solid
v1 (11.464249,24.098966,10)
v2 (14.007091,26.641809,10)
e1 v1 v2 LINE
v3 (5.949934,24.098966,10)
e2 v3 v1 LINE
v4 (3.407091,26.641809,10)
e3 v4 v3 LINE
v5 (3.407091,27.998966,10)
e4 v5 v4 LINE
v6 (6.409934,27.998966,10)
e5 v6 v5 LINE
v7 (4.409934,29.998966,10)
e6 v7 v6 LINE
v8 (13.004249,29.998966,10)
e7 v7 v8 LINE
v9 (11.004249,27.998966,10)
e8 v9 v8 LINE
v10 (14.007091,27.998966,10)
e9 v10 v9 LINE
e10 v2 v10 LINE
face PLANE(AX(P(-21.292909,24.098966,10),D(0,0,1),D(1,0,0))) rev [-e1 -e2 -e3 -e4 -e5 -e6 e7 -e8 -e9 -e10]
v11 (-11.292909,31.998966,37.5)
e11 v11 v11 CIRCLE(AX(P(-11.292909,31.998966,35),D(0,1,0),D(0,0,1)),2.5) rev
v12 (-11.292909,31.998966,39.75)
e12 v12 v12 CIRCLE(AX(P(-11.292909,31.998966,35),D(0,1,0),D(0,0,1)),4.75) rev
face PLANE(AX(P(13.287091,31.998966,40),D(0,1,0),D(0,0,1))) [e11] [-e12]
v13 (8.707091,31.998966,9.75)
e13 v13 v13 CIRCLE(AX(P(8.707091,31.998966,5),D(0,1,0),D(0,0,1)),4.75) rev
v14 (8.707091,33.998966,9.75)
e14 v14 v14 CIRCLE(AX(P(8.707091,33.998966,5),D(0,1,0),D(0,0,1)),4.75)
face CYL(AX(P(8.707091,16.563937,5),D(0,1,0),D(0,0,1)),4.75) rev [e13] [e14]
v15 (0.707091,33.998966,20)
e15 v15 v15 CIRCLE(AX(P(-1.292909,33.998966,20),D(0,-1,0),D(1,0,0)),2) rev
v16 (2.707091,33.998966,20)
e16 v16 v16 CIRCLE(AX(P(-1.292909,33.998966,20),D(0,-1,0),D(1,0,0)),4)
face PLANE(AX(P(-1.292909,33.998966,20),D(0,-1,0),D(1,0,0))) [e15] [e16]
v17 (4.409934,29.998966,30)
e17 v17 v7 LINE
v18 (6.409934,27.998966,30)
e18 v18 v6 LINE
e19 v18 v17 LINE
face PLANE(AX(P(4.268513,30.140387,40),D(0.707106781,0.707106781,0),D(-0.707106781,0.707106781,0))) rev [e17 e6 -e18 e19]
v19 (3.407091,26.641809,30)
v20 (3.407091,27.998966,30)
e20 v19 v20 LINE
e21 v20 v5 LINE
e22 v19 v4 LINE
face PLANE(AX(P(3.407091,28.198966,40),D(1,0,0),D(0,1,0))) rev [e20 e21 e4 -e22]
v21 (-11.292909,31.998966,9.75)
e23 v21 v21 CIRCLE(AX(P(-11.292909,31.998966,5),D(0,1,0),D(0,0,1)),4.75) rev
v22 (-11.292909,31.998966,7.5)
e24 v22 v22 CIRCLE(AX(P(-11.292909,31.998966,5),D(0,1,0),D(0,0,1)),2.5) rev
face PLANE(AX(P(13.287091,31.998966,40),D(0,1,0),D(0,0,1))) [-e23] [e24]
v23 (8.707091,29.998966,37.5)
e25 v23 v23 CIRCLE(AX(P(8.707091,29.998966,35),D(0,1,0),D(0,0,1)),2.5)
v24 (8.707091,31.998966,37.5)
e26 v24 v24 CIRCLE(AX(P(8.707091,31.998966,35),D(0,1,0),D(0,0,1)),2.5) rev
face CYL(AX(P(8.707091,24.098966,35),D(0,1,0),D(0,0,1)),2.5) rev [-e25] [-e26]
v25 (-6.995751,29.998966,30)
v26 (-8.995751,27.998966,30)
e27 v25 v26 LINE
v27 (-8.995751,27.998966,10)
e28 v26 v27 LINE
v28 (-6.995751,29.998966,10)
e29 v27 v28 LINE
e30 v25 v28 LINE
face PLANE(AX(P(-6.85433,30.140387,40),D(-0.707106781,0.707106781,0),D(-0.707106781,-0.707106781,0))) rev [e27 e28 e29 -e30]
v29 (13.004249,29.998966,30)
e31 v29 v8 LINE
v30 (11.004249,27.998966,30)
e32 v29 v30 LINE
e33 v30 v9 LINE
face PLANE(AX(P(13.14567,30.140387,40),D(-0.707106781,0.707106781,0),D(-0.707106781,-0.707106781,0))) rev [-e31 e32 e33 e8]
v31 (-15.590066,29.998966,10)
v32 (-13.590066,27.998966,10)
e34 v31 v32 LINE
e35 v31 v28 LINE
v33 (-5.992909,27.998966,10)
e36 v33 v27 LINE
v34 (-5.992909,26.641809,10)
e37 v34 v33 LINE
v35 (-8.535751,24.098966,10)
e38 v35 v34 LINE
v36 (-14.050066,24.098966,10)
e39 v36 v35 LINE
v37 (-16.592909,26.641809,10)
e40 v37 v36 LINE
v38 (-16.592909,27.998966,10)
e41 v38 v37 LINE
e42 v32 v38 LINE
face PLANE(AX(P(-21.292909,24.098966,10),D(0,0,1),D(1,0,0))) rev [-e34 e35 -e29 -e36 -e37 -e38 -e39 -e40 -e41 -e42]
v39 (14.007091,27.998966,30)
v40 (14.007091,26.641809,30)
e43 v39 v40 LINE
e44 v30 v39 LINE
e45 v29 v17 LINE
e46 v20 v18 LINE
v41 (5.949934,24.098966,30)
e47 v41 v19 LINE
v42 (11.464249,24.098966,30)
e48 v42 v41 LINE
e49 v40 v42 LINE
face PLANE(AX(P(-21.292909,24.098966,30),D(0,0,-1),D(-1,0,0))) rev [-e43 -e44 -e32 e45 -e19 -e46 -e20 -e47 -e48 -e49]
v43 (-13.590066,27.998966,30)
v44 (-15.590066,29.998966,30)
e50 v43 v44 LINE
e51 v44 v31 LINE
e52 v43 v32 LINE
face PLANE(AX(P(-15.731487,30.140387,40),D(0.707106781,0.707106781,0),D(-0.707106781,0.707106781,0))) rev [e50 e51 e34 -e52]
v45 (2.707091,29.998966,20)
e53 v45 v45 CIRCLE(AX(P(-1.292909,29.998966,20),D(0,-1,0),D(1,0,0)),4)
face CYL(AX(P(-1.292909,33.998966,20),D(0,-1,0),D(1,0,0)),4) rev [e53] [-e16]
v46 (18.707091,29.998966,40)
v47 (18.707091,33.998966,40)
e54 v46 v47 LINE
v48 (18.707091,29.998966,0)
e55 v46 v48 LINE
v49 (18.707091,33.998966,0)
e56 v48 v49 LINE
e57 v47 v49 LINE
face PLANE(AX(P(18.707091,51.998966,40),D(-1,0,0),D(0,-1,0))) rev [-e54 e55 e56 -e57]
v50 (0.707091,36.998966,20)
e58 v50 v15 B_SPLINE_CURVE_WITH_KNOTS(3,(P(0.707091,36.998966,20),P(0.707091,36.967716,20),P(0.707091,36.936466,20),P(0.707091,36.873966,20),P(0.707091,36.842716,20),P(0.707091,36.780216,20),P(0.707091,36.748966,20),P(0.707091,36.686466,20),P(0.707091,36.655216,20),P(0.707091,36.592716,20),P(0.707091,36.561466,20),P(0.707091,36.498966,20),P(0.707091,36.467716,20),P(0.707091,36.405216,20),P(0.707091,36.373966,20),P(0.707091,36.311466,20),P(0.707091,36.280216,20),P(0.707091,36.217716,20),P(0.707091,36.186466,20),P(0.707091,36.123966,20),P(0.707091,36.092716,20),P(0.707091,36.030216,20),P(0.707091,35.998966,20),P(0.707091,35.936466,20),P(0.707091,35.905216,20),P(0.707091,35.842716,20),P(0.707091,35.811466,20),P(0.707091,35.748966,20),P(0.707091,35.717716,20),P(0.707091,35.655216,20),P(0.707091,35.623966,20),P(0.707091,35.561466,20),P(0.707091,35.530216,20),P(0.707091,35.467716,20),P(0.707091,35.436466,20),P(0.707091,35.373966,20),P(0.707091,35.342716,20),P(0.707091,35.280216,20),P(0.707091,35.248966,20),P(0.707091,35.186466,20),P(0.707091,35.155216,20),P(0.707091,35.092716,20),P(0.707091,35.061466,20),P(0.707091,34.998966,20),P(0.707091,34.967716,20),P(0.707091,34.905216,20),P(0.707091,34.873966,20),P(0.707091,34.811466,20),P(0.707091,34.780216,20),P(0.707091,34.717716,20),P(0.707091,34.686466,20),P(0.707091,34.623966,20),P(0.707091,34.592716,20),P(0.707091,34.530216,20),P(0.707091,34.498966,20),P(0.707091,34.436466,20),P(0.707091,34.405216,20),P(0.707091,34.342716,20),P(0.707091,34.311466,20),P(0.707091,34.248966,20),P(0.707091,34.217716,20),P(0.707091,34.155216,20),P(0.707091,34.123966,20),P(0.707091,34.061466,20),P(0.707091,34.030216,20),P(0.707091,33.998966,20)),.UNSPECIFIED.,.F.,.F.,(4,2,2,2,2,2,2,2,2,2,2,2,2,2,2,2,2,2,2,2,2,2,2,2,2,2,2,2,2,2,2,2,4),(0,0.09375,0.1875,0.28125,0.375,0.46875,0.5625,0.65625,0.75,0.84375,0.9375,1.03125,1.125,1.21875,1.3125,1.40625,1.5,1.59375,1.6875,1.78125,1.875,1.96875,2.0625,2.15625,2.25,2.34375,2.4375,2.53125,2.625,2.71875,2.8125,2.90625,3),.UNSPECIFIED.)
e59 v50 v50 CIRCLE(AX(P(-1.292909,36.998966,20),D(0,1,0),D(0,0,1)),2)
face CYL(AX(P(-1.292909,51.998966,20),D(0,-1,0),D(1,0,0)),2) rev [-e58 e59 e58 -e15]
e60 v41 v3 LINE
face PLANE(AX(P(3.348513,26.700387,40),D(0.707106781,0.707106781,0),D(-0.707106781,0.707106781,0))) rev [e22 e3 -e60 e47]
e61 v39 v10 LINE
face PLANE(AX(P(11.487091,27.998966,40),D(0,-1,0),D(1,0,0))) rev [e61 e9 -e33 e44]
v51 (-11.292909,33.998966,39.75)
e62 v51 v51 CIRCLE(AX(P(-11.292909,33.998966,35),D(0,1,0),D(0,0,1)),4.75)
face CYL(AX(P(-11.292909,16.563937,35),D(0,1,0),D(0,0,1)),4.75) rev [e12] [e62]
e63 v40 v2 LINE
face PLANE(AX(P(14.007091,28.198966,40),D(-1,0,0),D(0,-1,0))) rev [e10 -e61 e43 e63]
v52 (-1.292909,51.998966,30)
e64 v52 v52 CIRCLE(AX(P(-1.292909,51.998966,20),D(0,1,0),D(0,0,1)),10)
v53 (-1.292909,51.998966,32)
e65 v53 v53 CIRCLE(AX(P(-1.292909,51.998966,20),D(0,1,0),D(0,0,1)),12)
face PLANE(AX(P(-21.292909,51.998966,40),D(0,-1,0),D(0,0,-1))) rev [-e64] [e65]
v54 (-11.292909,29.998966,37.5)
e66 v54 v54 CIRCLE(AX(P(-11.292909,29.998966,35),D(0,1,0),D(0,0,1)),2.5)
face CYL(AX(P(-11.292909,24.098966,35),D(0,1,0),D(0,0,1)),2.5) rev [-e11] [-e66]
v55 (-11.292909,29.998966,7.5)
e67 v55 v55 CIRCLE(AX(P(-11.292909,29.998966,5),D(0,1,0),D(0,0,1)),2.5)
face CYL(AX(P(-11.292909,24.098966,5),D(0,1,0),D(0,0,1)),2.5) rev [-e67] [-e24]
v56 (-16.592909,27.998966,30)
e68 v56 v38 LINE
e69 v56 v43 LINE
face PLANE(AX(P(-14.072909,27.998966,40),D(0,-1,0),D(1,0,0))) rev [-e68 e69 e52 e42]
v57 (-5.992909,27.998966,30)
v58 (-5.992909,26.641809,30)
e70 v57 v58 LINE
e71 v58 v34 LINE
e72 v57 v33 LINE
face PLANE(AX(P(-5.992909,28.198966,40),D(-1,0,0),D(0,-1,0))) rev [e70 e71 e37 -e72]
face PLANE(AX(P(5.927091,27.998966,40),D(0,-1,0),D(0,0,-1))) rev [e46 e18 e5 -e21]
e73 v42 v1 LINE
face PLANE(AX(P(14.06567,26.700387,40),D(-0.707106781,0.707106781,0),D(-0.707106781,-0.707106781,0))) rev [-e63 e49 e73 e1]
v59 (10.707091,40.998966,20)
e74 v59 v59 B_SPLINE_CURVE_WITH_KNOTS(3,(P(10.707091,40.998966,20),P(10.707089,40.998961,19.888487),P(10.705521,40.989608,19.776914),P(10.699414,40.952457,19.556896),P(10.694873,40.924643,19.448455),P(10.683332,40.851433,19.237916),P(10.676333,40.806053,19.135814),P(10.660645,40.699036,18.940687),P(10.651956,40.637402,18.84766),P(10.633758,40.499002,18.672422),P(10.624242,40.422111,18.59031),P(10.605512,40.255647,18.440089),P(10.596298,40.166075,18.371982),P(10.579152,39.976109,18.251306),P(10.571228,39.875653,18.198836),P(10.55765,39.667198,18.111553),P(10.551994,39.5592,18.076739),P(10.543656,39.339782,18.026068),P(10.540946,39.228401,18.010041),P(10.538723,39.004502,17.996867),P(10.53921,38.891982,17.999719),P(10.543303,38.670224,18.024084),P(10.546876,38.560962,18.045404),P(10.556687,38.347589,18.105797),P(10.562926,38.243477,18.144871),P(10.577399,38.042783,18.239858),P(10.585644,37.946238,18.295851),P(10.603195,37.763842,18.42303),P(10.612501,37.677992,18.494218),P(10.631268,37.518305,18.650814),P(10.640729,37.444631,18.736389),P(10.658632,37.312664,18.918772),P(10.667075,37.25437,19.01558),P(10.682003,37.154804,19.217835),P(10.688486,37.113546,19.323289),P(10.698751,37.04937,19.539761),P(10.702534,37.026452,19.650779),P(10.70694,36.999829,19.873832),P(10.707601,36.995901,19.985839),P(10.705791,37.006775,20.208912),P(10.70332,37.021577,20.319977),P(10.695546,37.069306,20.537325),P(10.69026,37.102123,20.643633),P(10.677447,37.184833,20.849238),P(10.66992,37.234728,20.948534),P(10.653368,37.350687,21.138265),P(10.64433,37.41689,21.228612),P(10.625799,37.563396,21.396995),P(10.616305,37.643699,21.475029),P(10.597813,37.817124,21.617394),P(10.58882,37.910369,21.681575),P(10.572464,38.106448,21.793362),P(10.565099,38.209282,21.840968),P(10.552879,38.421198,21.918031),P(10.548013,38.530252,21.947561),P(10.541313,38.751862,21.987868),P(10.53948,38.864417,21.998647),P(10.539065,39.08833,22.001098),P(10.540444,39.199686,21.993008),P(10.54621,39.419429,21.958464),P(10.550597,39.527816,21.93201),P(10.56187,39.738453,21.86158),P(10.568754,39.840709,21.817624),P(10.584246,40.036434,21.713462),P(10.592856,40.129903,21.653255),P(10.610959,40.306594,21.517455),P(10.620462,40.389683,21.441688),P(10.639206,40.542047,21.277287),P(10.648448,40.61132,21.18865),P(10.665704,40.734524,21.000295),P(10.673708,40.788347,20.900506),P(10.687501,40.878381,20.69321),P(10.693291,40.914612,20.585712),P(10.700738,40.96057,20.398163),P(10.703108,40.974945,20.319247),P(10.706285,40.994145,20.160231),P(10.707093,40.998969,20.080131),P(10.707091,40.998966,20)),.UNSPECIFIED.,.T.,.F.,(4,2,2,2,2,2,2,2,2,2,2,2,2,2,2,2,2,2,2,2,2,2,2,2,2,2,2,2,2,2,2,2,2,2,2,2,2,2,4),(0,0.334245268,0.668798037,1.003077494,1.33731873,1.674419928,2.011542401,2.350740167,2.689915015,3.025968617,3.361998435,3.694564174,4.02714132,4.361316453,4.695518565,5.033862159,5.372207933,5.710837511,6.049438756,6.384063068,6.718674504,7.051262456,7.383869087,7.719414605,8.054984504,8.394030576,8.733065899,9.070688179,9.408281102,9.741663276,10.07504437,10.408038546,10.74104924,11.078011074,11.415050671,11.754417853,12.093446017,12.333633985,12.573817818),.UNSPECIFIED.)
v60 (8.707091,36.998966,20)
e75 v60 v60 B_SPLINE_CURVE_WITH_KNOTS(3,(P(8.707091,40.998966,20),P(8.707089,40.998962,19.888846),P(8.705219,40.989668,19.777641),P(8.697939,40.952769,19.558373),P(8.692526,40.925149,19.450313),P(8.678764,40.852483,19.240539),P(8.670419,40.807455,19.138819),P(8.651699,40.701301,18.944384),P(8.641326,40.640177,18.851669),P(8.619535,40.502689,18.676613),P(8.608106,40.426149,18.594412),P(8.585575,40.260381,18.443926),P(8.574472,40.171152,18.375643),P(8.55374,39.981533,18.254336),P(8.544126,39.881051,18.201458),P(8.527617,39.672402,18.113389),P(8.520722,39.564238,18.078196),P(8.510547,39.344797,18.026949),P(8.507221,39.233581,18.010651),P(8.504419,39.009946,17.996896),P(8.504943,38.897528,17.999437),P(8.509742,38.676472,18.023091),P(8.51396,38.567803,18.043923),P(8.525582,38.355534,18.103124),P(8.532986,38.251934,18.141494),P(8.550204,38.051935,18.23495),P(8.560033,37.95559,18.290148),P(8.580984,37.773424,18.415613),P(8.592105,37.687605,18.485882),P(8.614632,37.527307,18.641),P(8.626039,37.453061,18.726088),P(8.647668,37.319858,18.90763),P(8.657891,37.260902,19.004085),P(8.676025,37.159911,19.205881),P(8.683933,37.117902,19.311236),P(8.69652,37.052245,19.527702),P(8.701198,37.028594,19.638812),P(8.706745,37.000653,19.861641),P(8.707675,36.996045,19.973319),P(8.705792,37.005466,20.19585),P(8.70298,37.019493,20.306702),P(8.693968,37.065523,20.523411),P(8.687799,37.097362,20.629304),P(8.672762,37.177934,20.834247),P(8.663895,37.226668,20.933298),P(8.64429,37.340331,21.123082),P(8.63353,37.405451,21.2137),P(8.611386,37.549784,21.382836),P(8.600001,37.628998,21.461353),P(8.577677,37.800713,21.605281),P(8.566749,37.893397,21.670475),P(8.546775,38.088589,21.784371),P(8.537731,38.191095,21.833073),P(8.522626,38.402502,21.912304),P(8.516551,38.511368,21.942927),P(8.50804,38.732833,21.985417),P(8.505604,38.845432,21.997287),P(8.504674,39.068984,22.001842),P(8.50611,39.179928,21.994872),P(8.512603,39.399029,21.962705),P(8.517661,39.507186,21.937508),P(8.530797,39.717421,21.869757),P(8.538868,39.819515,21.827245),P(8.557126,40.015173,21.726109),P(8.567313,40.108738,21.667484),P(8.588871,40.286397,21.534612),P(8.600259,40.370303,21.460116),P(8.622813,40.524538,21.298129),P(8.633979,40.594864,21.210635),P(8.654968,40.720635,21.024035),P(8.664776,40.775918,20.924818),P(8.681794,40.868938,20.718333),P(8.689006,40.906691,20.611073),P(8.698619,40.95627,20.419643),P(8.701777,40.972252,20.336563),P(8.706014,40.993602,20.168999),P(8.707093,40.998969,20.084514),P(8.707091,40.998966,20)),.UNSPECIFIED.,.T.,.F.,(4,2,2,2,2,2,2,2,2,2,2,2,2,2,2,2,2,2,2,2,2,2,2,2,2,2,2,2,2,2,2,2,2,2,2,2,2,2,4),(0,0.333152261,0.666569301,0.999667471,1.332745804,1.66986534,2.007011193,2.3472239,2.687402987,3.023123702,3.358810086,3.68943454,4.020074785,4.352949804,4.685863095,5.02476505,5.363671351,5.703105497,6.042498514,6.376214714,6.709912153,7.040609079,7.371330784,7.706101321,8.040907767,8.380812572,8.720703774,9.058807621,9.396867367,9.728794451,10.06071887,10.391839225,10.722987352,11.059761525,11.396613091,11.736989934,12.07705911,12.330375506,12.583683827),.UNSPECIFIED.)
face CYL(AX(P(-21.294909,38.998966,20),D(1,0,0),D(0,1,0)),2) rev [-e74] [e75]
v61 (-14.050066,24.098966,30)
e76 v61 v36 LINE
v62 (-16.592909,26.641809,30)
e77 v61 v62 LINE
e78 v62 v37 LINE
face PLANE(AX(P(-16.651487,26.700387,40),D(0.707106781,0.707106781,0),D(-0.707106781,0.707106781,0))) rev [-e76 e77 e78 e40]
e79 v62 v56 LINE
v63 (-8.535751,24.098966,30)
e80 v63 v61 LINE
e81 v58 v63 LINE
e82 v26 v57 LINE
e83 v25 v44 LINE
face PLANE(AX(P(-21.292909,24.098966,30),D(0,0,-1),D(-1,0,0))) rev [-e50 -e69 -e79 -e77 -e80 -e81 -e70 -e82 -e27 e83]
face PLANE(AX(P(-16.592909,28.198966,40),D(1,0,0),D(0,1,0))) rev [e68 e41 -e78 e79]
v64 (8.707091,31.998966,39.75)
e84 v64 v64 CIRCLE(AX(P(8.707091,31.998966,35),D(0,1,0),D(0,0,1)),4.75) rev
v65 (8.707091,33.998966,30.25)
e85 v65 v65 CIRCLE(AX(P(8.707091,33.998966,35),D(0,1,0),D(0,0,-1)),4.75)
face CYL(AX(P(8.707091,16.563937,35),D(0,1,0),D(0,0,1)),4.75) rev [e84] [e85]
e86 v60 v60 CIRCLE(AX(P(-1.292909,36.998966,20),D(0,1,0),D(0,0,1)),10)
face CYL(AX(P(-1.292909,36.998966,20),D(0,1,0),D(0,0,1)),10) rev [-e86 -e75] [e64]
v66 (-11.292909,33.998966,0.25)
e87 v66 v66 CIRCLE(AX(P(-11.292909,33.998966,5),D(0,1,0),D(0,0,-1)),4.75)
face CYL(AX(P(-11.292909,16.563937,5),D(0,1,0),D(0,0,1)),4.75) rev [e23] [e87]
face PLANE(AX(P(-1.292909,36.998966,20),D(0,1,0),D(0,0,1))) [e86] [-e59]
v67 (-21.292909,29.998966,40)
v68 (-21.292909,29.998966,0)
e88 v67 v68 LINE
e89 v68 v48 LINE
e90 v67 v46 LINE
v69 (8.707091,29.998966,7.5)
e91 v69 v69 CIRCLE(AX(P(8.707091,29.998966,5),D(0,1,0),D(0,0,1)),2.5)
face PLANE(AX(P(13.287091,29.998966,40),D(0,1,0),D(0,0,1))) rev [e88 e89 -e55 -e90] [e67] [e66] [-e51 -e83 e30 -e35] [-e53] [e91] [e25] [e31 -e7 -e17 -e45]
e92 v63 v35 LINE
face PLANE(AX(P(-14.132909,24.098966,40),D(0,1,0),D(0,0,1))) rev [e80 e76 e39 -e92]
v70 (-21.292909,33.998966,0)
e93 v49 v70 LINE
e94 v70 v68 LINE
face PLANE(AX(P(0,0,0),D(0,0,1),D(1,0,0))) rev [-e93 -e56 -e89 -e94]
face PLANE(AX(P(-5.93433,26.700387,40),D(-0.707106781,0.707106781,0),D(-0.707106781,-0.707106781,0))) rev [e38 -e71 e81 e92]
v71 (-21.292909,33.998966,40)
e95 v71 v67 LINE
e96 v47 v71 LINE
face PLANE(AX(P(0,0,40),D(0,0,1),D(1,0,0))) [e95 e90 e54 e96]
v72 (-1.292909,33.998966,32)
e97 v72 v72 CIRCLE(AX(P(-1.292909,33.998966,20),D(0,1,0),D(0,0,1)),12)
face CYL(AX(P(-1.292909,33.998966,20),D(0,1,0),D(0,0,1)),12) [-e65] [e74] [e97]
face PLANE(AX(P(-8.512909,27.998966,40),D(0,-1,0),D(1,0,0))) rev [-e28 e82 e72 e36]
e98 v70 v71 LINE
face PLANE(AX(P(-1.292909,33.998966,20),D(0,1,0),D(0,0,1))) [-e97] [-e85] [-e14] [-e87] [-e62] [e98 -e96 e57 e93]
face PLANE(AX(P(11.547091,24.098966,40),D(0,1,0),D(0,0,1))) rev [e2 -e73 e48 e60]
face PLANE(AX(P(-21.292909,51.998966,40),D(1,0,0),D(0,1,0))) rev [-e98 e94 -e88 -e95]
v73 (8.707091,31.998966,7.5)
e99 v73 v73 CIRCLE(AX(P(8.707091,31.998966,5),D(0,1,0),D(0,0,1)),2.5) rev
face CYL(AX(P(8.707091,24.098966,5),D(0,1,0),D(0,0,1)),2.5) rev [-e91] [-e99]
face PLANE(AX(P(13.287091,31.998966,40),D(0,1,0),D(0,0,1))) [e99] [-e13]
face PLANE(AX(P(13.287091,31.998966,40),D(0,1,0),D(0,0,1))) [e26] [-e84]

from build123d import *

# Parameters (mm, degrees)
BOSS_EXTRUDE1_DEPTH     = 40
MOVE_FACE1_DEPTH        = 40
SKETCH2_OUTSIDE_W       = 54.614
SKETCH2_OUTSIDE_H       = 54.614
SKETCH2_OUTSIDE_W_2     = 40
SKETCH2_OUTSIDE_H_2     = 20
CUT_EXTRUDE1_DEPTH      = 51.372492072
SKETCH3_R               = 10
CUT_EXTRUDE2_DEPTH      = 15
CUT_EXTRUDE3_REACH      = 78.837
CUT_EXTRUDE3_END_RADIUS = 10
SKETCH4_R               = 2
SKETCH5_R               = 2
CUT_EXTRUDE4_DEPTH      = 51.372492116
SKETCH6_R               = 4
CUT_EXTRUDE5_DEPTH      = 4
SKETCH7_OUTSIDE_W       = 54.614
SKETCH7_OUTSIDE_H       = 54.614
SKETCH7_OUTSIDE_R       = 12
CUT_EXTRUDE6_DEPTH      = 18
SKETCH8_R               = 2.5
CUT_EXTRUDE9_DEPTH      = 49.758465533
SKETCH9_R               = 4.75
CUT_EXTRUDE10_DEPTH     = 2


# Read off the part's stored shape, not the designer's step: Move Face1
with BuildPart() as part:
    # Sketch1 → Boss-Extrude1 (new body)
    with BuildSketch(Plane.XY):
        Polygon((-15.872908622, 29.998965851), (-14.072908622, 28.198965851), (-16.792908622, 28.198965851), (-16.792908622, 26.558965851), (-14.132908622, 23.898965851), (-8.452908622, 23.898965851), (-5.792908622, 26.558965851), (-5.792908622, 28.198965851), (-8.512908622, 28.198965851), (-6.712908622, 29.998965851), (4.127091378, 29.998965851), (5.927091378, 28.198965851), (3.207091378, 28.198965851), (3.207091378, 26.558965851), (5.867091378, 23.898965851), (11.547091378, 23.898965851), (14.207091378, 26.558965851), (14.207091378, 28.198965851), (11.487091378, 28.198965851), (13.287091378, 29.998965851), (18.707091378, 29.998965851), (18.707091378, 51.998965851), (-21.292908622, 51.998965851), (-21.292908622, 29.998965851), align=None)
    extrude(amount=BOSS_EXTRUDE1_DEPTH)

    # Move Face1 outline → Move Face1 (cut)
    with BuildSketch(Plane.XY):
        Polygon((-16.592908622, 27.998965851), (-13.590065909, 27.998965851), (-15.590065909, 29.998965851), (-15.872908622, 29.998965851), (-14.072908622, 28.198965851), (-16.792908622, 28.198965851), (-16.792908622, 26.558965851), (-14.132908622, 23.898965851), (-8.452908622, 23.898965851), (-5.792908622, 26.558965851), (-5.792908622, 28.198965851), (-8.512908622, 28.198965851), (-6.712908622, 29.998965851), (-6.995751334, 29.998965851), (-8.995751334, 27.998965851), (-5.992908622, 27.998965851), (-5.992908622, 26.641808564), (-8.535751334, 24.098965851), (-14.050065909, 24.098965851), (-16.592908622, 26.641808564), align=None)
        Polygon((4.409934091, 29.998965851), (4.127091378, 29.998965851), (5.927091378, 28.198965851), (3.207091378, 28.198965851), (3.207091378, 26.558965851), (5.867091378, 23.898965851), (11.547091378, 23.898965851), (14.207091378, 26.558965851), (14.207091378, 28.198965851), (11.487091378, 28.198965851), (13.287091378, 29.998965851), (13.004248666, 29.998965851), (11.004248666, 27.998965851), (14.007091378, 27.998965851), (14.007091378, 26.641808564), (11.464248666, 24.098965851), (5.949934091, 24.098965851), (3.407091378, 26.641808564), (3.407091378, 27.998965851), (6.409934091, 27.998965851), align=None)
    extrude(amount=MOVE_FACE1_DEPTH, mode=Mode.SUBTRACT)

    # Sketch2 outside → Cut-Extrude1 (cut, through all)
    with BuildSketch(Plane.XZ.offset(-29.998965851)):
        with Locations((-1.293, 20)):
            Rectangle(SKETCH2_OUTSIDE_W, SKETCH2_OUTSIDE_H)
        with Locations((-1.292908622, 20)):
            Rectangle(SKETCH2_OUTSIDE_W_2, SKETCH2_OUTSIDE_H_2, mode=Mode.SUBTRACT)
    extrude(amount=CUT_EXTRUDE1_DEPTH, mode=Mode.SUBTRACT)

    # Sketch3 → Cut-Extrude2 (cut)
    with BuildSketch(Plane(origin=(0, 51.998965851, 0), x_dir=(1, 0, 0), z_dir=(0, 1, 0))):
        with Locations(Location((-1.292908622, -20, 0), (0, 0, 270))):
            Circle(SKETCH3_R)
    extrude(amount=-CUT_EXTRUDE2_DEPTH, mode=Mode.SUBTRACT)

    # Cut-Extrude3: up to this cylinder (the profile starts outside it)
    cut_extrude3_end = Plane(origin=(-1.292908622, 38.998966, 20), z_dir=(0, 1, 0)) * Cylinder(CUT_EXTRUDE3_END_RADIUS, 178.674, mode=Mode.PRIVATE)
    # Sketch4 → Cut-Extrude3 (cut, up to the surface)
    with BuildSketch(Plane(origin=(18.707091378, 0, 0), x_dir=(0, 0, -1), z_dir=(1, 0, 0)), mode=Mode.PRIVATE) as cut_extrude3_sk1:
        with Locations(Location((-20, 38.998965851, 0), (0, 0, 90))):
            Circle(SKETCH4_R)
    cut_extrude3_tool1 = extrude(cut_extrude3_sk1.sketch, amount=-CUT_EXTRUDE3_REACH, mode=Mode.PRIVATE) - cut_extrude3_end
    add(cut_extrude3_tool1.solids().sort_by_distance((18.707091, 38.998966, 20))[0], mode=Mode.SUBTRACT)

    # Sketch5 → Cut-Extrude4 (cut, through all)
    with BuildSketch(Plane.XZ.offset(-29.998965851)):
        with Locations((-1.292908622, 20)):
            Circle(SKETCH5_R)
    extrude(amount=-CUT_EXTRUDE4_DEPTH, mode=Mode.SUBTRACT)

    # Sketch6 → Cut-Extrude5 (cut)
    with BuildSketch(Plane.XZ.offset(-29.998965851)):
        with Locations((-1.292908622, 20)):
            Circle(SKETCH6_R)
    extrude(amount=-CUT_EXTRUDE5_DEPTH, mode=Mode.SUBTRACT)

    # Sketch7 outside → Cut-Extrude6 (cut)
    with BuildSketch(Plane(origin=(0, 51.998965851, 0), x_dir=(1, 0, 0), z_dir=(0, 1, 0))):
        with Locations((-1.293, -20)):
            Rectangle(SKETCH7_OUTSIDE_W, SKETCH7_OUTSIDE_H)
        with Locations(Location((-1.292908622, -20, 0), (0, 0, 270))):
            Circle(SKETCH7_OUTSIDE_R, mode=Mode.SUBTRACT)
    extrude(amount=-CUT_EXTRUDE6_DEPTH, mode=Mode.SUBTRACT)

    # Sketch8 → Cut-Extrude9 (cut, through all)
    with BuildSketch(Plane(origin=(0, 33.998965851, 0), x_dir=(1, 0, 0), z_dir=(0, 1, 0))):
        with Locations(Location((8.707091378, -5, 0), (0, 0, 270))):
            Circle(SKETCH8_R)
        with Locations(Location((-11.292908622, -5, 0), (0, 0, 270))):
            Circle(SKETCH8_R)
        with Locations(Location((-11.292908622, -35, 0), (0, 0, 270))):
            Circle(SKETCH8_R)
        with Locations(Location((8.707091378, -35, 0), (0, 0, 270))):
            Circle(SKETCH8_R)
    extrude(amount=-CUT_EXTRUDE9_DEPTH, mode=Mode.SUBTRACT)

    # Sketch9 → Cut-Extrude10 (cut)
    with BuildSketch(Plane(origin=(0, 33.998965851, 0), x_dir=(1, 0, 0), z_dir=(0, 1, 0))):
        with Locations(Location((8.707091378, -5, 0), (0, 0, 270))):
            Circle(SKETCH9_R)
        with Locations(Location((8.707091378, -35, 0), (0, 0, 270))):
            Circle(SKETCH9_R)
        with Locations(Location((-11.292908622, -35, 0), (0, 0, 270))):
            Circle(SKETCH9_R)
        with Locations(Location((-11.292908622, -5, 0), (0, 0, 270))):
            Circle(SKETCH9_R)
    extrude(amount=-CUT_EXTRUDE10_DEPTH, mode=Mode.SUBTRACT)


solid = part.part
